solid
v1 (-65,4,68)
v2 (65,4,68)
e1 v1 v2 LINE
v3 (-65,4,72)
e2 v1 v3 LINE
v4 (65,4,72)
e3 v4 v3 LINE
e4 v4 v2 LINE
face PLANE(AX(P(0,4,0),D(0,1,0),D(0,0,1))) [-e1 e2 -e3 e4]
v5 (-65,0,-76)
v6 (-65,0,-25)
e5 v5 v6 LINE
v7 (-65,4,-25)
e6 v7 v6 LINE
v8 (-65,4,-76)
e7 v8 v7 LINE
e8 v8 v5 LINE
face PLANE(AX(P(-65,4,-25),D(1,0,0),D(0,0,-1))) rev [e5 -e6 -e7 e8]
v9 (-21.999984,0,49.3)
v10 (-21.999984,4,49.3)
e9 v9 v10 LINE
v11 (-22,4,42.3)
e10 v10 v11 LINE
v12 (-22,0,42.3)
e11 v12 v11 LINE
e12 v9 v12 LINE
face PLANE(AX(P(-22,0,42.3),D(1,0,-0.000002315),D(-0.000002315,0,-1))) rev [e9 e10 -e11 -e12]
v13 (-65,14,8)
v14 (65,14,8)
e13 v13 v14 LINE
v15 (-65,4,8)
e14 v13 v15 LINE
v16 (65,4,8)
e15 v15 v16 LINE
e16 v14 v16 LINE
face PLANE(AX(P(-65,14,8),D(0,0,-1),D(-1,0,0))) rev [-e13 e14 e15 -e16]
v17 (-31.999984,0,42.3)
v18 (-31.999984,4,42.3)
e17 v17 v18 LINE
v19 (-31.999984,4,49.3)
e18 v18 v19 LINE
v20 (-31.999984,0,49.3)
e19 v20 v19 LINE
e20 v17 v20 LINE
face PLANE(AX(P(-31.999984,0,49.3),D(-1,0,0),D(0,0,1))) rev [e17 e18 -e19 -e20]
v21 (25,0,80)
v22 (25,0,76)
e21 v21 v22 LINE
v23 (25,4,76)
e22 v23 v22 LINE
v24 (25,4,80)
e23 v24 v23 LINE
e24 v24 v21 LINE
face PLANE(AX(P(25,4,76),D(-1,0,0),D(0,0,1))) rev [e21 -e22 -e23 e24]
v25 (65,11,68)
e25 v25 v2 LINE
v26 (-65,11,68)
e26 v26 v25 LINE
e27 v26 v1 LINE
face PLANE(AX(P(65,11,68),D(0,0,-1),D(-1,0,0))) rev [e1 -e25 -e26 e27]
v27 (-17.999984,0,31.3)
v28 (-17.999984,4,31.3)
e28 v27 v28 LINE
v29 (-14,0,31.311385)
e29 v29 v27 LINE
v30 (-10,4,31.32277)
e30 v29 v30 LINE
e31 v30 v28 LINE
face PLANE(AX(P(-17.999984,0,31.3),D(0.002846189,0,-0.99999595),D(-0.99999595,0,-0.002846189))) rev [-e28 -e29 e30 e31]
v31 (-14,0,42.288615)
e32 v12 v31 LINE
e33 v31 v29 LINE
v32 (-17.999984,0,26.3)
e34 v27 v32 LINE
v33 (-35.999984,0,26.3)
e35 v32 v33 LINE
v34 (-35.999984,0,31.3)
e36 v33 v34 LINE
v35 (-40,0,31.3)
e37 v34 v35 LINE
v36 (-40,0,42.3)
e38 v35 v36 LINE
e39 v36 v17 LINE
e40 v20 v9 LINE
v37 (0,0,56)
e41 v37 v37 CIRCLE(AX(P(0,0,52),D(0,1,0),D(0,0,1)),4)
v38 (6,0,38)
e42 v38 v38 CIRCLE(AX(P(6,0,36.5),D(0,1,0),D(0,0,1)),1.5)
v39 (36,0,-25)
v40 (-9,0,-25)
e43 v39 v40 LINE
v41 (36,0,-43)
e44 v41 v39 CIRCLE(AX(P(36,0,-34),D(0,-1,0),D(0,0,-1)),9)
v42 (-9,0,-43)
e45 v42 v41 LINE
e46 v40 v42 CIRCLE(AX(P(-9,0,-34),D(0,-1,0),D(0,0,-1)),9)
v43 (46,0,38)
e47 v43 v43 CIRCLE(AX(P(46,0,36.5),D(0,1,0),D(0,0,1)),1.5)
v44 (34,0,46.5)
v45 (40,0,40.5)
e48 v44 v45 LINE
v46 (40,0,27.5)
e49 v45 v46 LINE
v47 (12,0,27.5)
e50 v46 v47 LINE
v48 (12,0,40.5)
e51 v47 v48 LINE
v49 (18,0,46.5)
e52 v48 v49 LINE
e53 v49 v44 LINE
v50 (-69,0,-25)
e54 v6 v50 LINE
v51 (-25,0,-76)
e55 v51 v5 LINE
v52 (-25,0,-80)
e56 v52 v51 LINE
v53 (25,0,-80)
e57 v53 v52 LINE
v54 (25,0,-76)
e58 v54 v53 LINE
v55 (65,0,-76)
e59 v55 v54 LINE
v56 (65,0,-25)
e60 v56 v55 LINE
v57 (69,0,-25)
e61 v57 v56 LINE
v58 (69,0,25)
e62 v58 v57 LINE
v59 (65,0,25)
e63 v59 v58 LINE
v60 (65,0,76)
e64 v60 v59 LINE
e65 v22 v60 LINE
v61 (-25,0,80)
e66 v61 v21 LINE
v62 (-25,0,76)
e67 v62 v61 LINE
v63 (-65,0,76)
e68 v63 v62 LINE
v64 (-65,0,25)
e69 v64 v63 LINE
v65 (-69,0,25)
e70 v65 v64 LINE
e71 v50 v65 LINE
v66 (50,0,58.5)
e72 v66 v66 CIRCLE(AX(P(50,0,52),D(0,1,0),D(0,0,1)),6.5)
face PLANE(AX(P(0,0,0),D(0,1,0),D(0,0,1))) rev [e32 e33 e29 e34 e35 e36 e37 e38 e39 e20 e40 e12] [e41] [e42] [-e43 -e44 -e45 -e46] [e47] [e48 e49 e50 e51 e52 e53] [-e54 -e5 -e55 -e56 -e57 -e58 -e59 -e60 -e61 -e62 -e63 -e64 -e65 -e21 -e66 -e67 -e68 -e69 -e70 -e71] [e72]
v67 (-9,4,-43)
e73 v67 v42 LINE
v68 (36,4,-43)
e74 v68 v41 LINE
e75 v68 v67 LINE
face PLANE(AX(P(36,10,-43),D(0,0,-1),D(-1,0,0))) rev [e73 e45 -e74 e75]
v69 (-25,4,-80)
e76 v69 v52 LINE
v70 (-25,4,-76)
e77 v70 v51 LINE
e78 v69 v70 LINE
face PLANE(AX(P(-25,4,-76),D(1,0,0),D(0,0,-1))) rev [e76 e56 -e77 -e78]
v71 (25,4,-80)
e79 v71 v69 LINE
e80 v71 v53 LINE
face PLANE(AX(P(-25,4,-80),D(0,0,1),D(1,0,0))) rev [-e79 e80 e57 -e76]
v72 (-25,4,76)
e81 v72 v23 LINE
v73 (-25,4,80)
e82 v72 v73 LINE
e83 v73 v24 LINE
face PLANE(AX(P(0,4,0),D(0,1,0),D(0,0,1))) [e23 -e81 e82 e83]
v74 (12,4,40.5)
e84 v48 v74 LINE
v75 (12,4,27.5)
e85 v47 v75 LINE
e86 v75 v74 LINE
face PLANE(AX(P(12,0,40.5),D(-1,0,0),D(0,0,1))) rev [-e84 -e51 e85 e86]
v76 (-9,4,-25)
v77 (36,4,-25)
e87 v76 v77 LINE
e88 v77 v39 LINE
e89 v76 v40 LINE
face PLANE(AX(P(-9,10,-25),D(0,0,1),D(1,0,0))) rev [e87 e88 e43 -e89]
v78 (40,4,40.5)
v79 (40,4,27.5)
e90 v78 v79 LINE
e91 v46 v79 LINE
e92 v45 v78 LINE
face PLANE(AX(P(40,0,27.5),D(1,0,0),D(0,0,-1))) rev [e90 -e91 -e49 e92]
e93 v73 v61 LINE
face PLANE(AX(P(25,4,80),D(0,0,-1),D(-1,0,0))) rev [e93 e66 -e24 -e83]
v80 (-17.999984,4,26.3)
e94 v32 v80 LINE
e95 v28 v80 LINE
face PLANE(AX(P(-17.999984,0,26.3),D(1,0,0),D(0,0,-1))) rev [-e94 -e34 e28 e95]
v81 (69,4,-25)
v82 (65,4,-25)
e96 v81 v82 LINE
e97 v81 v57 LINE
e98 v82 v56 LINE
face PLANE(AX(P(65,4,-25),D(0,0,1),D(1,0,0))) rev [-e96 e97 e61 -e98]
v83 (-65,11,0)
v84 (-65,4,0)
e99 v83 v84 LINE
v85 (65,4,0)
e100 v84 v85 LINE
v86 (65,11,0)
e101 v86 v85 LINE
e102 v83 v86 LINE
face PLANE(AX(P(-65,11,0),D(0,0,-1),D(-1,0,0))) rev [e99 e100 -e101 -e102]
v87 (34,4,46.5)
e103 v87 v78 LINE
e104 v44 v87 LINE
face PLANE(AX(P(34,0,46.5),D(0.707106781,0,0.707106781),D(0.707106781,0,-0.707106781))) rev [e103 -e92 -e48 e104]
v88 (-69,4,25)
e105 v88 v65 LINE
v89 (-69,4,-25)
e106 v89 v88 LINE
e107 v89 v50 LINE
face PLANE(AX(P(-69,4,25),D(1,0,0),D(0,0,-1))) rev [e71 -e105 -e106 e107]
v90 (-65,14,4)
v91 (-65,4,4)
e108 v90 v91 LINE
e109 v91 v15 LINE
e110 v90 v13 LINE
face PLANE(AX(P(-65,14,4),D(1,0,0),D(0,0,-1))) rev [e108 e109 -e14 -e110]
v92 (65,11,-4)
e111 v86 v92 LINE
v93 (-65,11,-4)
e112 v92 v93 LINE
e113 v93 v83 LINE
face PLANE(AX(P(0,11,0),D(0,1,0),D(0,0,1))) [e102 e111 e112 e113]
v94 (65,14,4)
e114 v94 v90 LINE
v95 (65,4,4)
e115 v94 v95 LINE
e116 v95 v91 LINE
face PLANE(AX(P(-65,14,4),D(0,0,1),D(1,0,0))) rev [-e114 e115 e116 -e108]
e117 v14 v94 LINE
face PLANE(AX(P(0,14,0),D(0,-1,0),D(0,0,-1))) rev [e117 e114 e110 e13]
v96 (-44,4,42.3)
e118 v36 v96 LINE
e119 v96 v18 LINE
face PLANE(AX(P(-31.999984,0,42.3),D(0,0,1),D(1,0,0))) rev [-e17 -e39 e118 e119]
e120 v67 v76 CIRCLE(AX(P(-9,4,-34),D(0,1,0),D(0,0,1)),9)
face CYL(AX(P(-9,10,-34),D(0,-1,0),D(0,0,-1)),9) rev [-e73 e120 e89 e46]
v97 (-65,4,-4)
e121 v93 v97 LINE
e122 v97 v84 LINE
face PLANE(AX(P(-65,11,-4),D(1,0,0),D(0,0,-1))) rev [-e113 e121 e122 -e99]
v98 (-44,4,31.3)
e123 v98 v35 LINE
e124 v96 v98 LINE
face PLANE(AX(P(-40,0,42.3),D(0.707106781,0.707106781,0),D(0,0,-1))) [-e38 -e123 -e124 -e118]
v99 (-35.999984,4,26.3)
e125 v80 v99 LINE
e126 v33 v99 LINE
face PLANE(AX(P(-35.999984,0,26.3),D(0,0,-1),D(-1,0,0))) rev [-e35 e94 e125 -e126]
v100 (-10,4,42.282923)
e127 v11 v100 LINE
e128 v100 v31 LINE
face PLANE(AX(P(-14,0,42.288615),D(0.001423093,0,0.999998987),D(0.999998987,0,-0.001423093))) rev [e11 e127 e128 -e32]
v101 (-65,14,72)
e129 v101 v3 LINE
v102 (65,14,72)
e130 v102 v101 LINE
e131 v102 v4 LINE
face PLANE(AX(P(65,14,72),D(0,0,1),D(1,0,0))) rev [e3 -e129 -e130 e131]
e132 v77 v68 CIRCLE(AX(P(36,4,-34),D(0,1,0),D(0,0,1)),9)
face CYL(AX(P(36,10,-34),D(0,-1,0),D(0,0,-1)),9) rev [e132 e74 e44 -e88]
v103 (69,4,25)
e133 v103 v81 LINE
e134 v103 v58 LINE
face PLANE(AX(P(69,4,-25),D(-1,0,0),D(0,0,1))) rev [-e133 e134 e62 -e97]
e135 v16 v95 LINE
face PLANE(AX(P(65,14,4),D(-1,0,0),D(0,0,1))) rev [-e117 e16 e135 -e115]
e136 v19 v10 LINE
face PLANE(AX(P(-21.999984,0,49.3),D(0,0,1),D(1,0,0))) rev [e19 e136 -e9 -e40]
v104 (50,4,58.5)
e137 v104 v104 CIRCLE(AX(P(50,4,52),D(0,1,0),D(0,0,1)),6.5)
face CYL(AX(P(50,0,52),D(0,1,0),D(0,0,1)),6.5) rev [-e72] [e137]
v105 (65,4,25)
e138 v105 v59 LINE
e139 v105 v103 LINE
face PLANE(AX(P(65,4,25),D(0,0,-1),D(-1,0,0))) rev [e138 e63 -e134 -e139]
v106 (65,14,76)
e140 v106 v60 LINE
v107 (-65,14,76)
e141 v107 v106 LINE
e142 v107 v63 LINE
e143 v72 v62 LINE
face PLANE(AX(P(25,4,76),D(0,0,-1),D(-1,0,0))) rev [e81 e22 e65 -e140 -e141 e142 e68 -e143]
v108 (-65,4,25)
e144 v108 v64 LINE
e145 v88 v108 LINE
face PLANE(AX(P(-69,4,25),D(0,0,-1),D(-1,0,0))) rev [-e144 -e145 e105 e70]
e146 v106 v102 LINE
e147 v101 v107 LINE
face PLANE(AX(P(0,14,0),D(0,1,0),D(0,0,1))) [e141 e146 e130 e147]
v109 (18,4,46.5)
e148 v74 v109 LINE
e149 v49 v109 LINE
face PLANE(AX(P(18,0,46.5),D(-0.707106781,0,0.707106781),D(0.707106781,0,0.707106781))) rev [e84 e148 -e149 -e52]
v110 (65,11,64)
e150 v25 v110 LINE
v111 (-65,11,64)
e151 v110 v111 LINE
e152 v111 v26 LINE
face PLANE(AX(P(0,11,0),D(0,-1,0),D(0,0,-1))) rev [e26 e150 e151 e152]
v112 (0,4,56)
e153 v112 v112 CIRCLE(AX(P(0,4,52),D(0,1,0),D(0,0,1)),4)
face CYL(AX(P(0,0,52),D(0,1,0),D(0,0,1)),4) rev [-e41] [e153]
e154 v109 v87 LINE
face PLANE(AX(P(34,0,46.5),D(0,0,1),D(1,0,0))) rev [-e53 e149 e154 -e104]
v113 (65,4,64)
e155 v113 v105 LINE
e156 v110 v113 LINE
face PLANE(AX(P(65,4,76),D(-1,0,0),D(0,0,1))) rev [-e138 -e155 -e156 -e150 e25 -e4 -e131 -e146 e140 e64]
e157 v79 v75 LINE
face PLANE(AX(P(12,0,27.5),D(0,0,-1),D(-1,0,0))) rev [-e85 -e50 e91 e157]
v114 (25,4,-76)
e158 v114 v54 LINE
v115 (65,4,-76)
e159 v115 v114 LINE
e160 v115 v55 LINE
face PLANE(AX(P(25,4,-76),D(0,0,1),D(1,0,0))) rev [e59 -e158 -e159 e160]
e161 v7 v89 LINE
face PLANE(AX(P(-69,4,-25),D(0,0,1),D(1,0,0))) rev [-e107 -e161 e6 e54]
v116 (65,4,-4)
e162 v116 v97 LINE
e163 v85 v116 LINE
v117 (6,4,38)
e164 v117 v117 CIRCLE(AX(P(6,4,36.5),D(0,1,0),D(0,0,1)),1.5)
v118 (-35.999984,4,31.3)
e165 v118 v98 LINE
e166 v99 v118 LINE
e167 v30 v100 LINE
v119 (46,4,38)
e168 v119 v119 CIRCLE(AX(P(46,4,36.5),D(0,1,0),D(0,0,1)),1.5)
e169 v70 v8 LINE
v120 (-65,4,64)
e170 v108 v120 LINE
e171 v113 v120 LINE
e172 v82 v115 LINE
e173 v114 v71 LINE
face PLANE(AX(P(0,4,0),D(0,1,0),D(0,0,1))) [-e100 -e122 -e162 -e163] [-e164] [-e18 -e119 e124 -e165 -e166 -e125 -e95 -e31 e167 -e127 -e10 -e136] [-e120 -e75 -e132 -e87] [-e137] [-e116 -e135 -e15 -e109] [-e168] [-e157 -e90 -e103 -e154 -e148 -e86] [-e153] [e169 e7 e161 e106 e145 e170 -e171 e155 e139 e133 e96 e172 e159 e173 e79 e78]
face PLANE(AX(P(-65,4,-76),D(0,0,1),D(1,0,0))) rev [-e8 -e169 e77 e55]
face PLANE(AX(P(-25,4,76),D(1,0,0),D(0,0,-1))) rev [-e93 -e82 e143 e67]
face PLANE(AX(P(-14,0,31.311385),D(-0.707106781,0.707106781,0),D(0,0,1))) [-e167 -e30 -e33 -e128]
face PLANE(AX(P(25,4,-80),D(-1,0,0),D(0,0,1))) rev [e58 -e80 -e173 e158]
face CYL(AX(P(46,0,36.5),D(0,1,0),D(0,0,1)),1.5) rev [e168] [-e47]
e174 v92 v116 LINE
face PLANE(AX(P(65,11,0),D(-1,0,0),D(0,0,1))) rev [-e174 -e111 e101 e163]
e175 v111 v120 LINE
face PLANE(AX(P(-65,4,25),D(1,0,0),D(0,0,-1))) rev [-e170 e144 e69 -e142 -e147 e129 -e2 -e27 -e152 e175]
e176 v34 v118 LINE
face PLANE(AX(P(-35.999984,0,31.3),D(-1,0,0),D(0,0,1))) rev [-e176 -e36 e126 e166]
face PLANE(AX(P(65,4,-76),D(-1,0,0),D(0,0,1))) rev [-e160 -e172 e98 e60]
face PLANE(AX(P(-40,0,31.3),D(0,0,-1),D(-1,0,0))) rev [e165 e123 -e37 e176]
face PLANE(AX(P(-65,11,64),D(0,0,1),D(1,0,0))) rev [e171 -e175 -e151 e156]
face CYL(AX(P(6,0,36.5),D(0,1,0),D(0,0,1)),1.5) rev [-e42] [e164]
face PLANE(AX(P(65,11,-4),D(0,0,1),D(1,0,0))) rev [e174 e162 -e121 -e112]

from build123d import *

# Parameters (mm, degrees)
BOSS_EXTRUDE1_DEPTH = 4
SKETCH4_W           = 130
SKETCH4_H           = 4
BOSS_EXTRUDE2_DEPTH = 10
SKETCH5_W           = 130
SKETCH5_H           = 4
BOSS_EXTRUDE3_DEPTH = 7
SKETCH6_W           = 130
SKETCH6_H           = 4
BOSS_EXTRUDE4_DEPTH = 10
SKETCH8_W           = 130
SKETCH8_H           = 4
BOSS_EXTRUDE5_DEPTH = 7
CUT_EXTRUDE1_DEPTH  = 107.117859006
CHAMFER2_SIZE       = 4
CHAMFER3_SIZE       = 4
CUT_EXTRUDE3_DEPTH  = 107.117859006
SKETCH12_R          = 1.5
CUT_EXTRUDE4_DEPTH  = 107.117859006
SKETCH13_R          = 6.5
CUT_EXTRUDE5_DEPTH  = 107.117859006
SKETCH14_R          = 4
CUT_EXTRUDE6_DEPTH  = 107.117859006
CUT_EXTRUDE7_DEPTH  = 10


with BuildPart() as part:
    # Sketch3 → Boss-Extrude1 (new body)
    with BuildSketch(Plane(origin=(0, 0, 0), x_dir=(1, 0, 0), z_dir=(0, 1, 0))):
        Polygon((-25, 80), (25, 80), (25, 76), (65, 76), (65, 25), (69, 25), (69, -25), (65, -25), (65, -76), (25, -76), (25, -80), (-25, -80), (-25, -76), (-65, -76), (-65, -25), (-69, -25), (-69, 25), (-65, 25), (-65, 76), (-25, 76), align=None)
    extrude(amount=BOSS_EXTRUDE1_DEPTH)

    # Sketch4 → Boss-Extrude2 (add)
    with BuildSketch(Plane(origin=(0, 4, 0), x_dir=(1, 0, 0), z_dir=(0, 1, 0))):
        with Locations((0, -74)):
            Rectangle(SKETCH4_W, SKETCH4_H)
    extrude(amount=BOSS_EXTRUDE2_DEPTH)

    # Sketch5 → Boss-Extrude3 (add)
    with BuildSketch(Plane(origin=(0, 4, 0), x_dir=(1, 0, 0), z_dir=(0, 1, 0))):
        with Locations((0, -66)):
            Rectangle(SKETCH5_W, SKETCH5_H)
    extrude(amount=BOSS_EXTRUDE3_DEPTH)

    # Sketch6 → Boss-Extrude4 (add)
    with BuildSketch(Plane(origin=(0, 4, 0), x_dir=(1, 0, 0), z_dir=(0, 1, 0))):
        with Locations((0, -6)):
            Rectangle(SKETCH6_W, SKETCH6_H)
    extrude(amount=BOSS_EXTRUDE4_DEPTH)

    # Sketch8 → Boss-Extrude5 (add)
    with BuildSketch(Plane(origin=(0, 4, 0), x_dir=(1, 0, 0), z_dir=(0, 1, 0))):
        with Locations((0, 2)):
            Rectangle(SKETCH8_W, SKETCH8_H)
    extrude(amount=BOSS_EXTRUDE5_DEPTH)

    # Sketch9 → Cut-Extrude1 (cut, through all)
    with BuildSketch(Plane(origin=(0, 4, 0), x_dir=(1, 0, 0), z_dir=(0, 1, 0))):
        Polygon((-21.999983798, -49.3), (-31.999983798, -49.3), (-31.999983798, -42.3), (-40, -42.3), (-40, -31.3), (-35.999983798, -31.3), (-35.999983798, -26.3), (-17.999983798, -26.3), (-17.999983798, -31.3), (-14, -31.311384755), (-14, -42.288615245), (-22, -42.3), align=None)
    extrude(amount=-CUT_EXTRUDE1_DEPTH, mode=Mode.SUBTRACT)

    # Chamfer2
    chamfer2_edges = [part.edges().sort_by_distance(p)[0] for p in [
        (-40, 4, 36.8),
    ]]
    chamfer(chamfer2_edges, length=CHAMFER2_SIZE - 0.0001)  # a hair under: the kernel refuses the full size

    # Chamfer3
    chamfer3_edges = [part.edges().sort_by_distance(p)[0] for p in [
        (-14, 4, 36.8),
    ]]
    chamfer(chamfer3_edges, length=CHAMFER3_SIZE - 0.0001)  # a hair under: the kernel refuses the full size

    # Sketch11 → Cut-Extrude3 (cut, through all)
    with BuildSketch(Plane(origin=(0, 4, 0), x_dir=(1, 0, 0), z_dir=(0, 1, 0))):
        Polygon((12, -27.5), (40, -27.5), (40, -40.5), (34, -46.5), (18, -46.5), (12, -40.5), align=None)
    extrude(amount=-CUT_EXTRUDE3_DEPTH, mode=Mode.SUBTRACT)

    # Sketch12 → Cut-Extrude4 (cut, through all)
    with BuildSketch(Plane(origin=(0, 4, 0), x_dir=(1, 0, 0), z_dir=(0, 1, 0))):
        with Locations(Location((6, -36.5, 0), (0, 0, 270))):
            Circle(SKETCH12_R)
        with Locations(Location((46, -36.5, 0), (0, 0, 270))):
            Circle(SKETCH12_R)
    extrude(amount=-CUT_EXTRUDE4_DEPTH, mode=Mode.SUBTRACT)

    # Sketch13 → Cut-Extrude5 (cut, through all)
    with BuildSketch(Plane(origin=(0, 4, 0), x_dir=(1, 0, 0), z_dir=(0, 1, 0))):
        with Locations(Location((50, -52, 0), (0, 0, 270))):
            Circle(SKETCH13_R)
    extrude(amount=-CUT_EXTRUDE5_DEPTH, mode=Mode.SUBTRACT)

    # Sketch14 → Cut-Extrude6 (cut, through all)
    with BuildSketch(Plane(origin=(0, 4, 0), x_dir=(1, 0, 0), z_dir=(0, 1, 0))):
        with Locations(Location((0, -52, 0), (0, 0, 270))):
            Circle(SKETCH14_R)
    extrude(amount=-CUT_EXTRUDE6_DEPTH, mode=Mode.SUBTRACT)

    # Sketch15 → Cut-Extrude7 (cut)
    with BuildSketch(Plane.XZ):
        with BuildLine():
            Line((-9, -25), (36, -25))
            ThreePointArc((36, -25), (45, -34), (36, -43))
            Line((36, -43), (-9, -43))
            ThreePointArc((-9, -43), (-18, -34), (-9, -25))
        make_face()
    extrude(amount=-CUT_EXTRUDE7_DEPTH, mode=Mode.SUBTRACT)


solid = part.part
